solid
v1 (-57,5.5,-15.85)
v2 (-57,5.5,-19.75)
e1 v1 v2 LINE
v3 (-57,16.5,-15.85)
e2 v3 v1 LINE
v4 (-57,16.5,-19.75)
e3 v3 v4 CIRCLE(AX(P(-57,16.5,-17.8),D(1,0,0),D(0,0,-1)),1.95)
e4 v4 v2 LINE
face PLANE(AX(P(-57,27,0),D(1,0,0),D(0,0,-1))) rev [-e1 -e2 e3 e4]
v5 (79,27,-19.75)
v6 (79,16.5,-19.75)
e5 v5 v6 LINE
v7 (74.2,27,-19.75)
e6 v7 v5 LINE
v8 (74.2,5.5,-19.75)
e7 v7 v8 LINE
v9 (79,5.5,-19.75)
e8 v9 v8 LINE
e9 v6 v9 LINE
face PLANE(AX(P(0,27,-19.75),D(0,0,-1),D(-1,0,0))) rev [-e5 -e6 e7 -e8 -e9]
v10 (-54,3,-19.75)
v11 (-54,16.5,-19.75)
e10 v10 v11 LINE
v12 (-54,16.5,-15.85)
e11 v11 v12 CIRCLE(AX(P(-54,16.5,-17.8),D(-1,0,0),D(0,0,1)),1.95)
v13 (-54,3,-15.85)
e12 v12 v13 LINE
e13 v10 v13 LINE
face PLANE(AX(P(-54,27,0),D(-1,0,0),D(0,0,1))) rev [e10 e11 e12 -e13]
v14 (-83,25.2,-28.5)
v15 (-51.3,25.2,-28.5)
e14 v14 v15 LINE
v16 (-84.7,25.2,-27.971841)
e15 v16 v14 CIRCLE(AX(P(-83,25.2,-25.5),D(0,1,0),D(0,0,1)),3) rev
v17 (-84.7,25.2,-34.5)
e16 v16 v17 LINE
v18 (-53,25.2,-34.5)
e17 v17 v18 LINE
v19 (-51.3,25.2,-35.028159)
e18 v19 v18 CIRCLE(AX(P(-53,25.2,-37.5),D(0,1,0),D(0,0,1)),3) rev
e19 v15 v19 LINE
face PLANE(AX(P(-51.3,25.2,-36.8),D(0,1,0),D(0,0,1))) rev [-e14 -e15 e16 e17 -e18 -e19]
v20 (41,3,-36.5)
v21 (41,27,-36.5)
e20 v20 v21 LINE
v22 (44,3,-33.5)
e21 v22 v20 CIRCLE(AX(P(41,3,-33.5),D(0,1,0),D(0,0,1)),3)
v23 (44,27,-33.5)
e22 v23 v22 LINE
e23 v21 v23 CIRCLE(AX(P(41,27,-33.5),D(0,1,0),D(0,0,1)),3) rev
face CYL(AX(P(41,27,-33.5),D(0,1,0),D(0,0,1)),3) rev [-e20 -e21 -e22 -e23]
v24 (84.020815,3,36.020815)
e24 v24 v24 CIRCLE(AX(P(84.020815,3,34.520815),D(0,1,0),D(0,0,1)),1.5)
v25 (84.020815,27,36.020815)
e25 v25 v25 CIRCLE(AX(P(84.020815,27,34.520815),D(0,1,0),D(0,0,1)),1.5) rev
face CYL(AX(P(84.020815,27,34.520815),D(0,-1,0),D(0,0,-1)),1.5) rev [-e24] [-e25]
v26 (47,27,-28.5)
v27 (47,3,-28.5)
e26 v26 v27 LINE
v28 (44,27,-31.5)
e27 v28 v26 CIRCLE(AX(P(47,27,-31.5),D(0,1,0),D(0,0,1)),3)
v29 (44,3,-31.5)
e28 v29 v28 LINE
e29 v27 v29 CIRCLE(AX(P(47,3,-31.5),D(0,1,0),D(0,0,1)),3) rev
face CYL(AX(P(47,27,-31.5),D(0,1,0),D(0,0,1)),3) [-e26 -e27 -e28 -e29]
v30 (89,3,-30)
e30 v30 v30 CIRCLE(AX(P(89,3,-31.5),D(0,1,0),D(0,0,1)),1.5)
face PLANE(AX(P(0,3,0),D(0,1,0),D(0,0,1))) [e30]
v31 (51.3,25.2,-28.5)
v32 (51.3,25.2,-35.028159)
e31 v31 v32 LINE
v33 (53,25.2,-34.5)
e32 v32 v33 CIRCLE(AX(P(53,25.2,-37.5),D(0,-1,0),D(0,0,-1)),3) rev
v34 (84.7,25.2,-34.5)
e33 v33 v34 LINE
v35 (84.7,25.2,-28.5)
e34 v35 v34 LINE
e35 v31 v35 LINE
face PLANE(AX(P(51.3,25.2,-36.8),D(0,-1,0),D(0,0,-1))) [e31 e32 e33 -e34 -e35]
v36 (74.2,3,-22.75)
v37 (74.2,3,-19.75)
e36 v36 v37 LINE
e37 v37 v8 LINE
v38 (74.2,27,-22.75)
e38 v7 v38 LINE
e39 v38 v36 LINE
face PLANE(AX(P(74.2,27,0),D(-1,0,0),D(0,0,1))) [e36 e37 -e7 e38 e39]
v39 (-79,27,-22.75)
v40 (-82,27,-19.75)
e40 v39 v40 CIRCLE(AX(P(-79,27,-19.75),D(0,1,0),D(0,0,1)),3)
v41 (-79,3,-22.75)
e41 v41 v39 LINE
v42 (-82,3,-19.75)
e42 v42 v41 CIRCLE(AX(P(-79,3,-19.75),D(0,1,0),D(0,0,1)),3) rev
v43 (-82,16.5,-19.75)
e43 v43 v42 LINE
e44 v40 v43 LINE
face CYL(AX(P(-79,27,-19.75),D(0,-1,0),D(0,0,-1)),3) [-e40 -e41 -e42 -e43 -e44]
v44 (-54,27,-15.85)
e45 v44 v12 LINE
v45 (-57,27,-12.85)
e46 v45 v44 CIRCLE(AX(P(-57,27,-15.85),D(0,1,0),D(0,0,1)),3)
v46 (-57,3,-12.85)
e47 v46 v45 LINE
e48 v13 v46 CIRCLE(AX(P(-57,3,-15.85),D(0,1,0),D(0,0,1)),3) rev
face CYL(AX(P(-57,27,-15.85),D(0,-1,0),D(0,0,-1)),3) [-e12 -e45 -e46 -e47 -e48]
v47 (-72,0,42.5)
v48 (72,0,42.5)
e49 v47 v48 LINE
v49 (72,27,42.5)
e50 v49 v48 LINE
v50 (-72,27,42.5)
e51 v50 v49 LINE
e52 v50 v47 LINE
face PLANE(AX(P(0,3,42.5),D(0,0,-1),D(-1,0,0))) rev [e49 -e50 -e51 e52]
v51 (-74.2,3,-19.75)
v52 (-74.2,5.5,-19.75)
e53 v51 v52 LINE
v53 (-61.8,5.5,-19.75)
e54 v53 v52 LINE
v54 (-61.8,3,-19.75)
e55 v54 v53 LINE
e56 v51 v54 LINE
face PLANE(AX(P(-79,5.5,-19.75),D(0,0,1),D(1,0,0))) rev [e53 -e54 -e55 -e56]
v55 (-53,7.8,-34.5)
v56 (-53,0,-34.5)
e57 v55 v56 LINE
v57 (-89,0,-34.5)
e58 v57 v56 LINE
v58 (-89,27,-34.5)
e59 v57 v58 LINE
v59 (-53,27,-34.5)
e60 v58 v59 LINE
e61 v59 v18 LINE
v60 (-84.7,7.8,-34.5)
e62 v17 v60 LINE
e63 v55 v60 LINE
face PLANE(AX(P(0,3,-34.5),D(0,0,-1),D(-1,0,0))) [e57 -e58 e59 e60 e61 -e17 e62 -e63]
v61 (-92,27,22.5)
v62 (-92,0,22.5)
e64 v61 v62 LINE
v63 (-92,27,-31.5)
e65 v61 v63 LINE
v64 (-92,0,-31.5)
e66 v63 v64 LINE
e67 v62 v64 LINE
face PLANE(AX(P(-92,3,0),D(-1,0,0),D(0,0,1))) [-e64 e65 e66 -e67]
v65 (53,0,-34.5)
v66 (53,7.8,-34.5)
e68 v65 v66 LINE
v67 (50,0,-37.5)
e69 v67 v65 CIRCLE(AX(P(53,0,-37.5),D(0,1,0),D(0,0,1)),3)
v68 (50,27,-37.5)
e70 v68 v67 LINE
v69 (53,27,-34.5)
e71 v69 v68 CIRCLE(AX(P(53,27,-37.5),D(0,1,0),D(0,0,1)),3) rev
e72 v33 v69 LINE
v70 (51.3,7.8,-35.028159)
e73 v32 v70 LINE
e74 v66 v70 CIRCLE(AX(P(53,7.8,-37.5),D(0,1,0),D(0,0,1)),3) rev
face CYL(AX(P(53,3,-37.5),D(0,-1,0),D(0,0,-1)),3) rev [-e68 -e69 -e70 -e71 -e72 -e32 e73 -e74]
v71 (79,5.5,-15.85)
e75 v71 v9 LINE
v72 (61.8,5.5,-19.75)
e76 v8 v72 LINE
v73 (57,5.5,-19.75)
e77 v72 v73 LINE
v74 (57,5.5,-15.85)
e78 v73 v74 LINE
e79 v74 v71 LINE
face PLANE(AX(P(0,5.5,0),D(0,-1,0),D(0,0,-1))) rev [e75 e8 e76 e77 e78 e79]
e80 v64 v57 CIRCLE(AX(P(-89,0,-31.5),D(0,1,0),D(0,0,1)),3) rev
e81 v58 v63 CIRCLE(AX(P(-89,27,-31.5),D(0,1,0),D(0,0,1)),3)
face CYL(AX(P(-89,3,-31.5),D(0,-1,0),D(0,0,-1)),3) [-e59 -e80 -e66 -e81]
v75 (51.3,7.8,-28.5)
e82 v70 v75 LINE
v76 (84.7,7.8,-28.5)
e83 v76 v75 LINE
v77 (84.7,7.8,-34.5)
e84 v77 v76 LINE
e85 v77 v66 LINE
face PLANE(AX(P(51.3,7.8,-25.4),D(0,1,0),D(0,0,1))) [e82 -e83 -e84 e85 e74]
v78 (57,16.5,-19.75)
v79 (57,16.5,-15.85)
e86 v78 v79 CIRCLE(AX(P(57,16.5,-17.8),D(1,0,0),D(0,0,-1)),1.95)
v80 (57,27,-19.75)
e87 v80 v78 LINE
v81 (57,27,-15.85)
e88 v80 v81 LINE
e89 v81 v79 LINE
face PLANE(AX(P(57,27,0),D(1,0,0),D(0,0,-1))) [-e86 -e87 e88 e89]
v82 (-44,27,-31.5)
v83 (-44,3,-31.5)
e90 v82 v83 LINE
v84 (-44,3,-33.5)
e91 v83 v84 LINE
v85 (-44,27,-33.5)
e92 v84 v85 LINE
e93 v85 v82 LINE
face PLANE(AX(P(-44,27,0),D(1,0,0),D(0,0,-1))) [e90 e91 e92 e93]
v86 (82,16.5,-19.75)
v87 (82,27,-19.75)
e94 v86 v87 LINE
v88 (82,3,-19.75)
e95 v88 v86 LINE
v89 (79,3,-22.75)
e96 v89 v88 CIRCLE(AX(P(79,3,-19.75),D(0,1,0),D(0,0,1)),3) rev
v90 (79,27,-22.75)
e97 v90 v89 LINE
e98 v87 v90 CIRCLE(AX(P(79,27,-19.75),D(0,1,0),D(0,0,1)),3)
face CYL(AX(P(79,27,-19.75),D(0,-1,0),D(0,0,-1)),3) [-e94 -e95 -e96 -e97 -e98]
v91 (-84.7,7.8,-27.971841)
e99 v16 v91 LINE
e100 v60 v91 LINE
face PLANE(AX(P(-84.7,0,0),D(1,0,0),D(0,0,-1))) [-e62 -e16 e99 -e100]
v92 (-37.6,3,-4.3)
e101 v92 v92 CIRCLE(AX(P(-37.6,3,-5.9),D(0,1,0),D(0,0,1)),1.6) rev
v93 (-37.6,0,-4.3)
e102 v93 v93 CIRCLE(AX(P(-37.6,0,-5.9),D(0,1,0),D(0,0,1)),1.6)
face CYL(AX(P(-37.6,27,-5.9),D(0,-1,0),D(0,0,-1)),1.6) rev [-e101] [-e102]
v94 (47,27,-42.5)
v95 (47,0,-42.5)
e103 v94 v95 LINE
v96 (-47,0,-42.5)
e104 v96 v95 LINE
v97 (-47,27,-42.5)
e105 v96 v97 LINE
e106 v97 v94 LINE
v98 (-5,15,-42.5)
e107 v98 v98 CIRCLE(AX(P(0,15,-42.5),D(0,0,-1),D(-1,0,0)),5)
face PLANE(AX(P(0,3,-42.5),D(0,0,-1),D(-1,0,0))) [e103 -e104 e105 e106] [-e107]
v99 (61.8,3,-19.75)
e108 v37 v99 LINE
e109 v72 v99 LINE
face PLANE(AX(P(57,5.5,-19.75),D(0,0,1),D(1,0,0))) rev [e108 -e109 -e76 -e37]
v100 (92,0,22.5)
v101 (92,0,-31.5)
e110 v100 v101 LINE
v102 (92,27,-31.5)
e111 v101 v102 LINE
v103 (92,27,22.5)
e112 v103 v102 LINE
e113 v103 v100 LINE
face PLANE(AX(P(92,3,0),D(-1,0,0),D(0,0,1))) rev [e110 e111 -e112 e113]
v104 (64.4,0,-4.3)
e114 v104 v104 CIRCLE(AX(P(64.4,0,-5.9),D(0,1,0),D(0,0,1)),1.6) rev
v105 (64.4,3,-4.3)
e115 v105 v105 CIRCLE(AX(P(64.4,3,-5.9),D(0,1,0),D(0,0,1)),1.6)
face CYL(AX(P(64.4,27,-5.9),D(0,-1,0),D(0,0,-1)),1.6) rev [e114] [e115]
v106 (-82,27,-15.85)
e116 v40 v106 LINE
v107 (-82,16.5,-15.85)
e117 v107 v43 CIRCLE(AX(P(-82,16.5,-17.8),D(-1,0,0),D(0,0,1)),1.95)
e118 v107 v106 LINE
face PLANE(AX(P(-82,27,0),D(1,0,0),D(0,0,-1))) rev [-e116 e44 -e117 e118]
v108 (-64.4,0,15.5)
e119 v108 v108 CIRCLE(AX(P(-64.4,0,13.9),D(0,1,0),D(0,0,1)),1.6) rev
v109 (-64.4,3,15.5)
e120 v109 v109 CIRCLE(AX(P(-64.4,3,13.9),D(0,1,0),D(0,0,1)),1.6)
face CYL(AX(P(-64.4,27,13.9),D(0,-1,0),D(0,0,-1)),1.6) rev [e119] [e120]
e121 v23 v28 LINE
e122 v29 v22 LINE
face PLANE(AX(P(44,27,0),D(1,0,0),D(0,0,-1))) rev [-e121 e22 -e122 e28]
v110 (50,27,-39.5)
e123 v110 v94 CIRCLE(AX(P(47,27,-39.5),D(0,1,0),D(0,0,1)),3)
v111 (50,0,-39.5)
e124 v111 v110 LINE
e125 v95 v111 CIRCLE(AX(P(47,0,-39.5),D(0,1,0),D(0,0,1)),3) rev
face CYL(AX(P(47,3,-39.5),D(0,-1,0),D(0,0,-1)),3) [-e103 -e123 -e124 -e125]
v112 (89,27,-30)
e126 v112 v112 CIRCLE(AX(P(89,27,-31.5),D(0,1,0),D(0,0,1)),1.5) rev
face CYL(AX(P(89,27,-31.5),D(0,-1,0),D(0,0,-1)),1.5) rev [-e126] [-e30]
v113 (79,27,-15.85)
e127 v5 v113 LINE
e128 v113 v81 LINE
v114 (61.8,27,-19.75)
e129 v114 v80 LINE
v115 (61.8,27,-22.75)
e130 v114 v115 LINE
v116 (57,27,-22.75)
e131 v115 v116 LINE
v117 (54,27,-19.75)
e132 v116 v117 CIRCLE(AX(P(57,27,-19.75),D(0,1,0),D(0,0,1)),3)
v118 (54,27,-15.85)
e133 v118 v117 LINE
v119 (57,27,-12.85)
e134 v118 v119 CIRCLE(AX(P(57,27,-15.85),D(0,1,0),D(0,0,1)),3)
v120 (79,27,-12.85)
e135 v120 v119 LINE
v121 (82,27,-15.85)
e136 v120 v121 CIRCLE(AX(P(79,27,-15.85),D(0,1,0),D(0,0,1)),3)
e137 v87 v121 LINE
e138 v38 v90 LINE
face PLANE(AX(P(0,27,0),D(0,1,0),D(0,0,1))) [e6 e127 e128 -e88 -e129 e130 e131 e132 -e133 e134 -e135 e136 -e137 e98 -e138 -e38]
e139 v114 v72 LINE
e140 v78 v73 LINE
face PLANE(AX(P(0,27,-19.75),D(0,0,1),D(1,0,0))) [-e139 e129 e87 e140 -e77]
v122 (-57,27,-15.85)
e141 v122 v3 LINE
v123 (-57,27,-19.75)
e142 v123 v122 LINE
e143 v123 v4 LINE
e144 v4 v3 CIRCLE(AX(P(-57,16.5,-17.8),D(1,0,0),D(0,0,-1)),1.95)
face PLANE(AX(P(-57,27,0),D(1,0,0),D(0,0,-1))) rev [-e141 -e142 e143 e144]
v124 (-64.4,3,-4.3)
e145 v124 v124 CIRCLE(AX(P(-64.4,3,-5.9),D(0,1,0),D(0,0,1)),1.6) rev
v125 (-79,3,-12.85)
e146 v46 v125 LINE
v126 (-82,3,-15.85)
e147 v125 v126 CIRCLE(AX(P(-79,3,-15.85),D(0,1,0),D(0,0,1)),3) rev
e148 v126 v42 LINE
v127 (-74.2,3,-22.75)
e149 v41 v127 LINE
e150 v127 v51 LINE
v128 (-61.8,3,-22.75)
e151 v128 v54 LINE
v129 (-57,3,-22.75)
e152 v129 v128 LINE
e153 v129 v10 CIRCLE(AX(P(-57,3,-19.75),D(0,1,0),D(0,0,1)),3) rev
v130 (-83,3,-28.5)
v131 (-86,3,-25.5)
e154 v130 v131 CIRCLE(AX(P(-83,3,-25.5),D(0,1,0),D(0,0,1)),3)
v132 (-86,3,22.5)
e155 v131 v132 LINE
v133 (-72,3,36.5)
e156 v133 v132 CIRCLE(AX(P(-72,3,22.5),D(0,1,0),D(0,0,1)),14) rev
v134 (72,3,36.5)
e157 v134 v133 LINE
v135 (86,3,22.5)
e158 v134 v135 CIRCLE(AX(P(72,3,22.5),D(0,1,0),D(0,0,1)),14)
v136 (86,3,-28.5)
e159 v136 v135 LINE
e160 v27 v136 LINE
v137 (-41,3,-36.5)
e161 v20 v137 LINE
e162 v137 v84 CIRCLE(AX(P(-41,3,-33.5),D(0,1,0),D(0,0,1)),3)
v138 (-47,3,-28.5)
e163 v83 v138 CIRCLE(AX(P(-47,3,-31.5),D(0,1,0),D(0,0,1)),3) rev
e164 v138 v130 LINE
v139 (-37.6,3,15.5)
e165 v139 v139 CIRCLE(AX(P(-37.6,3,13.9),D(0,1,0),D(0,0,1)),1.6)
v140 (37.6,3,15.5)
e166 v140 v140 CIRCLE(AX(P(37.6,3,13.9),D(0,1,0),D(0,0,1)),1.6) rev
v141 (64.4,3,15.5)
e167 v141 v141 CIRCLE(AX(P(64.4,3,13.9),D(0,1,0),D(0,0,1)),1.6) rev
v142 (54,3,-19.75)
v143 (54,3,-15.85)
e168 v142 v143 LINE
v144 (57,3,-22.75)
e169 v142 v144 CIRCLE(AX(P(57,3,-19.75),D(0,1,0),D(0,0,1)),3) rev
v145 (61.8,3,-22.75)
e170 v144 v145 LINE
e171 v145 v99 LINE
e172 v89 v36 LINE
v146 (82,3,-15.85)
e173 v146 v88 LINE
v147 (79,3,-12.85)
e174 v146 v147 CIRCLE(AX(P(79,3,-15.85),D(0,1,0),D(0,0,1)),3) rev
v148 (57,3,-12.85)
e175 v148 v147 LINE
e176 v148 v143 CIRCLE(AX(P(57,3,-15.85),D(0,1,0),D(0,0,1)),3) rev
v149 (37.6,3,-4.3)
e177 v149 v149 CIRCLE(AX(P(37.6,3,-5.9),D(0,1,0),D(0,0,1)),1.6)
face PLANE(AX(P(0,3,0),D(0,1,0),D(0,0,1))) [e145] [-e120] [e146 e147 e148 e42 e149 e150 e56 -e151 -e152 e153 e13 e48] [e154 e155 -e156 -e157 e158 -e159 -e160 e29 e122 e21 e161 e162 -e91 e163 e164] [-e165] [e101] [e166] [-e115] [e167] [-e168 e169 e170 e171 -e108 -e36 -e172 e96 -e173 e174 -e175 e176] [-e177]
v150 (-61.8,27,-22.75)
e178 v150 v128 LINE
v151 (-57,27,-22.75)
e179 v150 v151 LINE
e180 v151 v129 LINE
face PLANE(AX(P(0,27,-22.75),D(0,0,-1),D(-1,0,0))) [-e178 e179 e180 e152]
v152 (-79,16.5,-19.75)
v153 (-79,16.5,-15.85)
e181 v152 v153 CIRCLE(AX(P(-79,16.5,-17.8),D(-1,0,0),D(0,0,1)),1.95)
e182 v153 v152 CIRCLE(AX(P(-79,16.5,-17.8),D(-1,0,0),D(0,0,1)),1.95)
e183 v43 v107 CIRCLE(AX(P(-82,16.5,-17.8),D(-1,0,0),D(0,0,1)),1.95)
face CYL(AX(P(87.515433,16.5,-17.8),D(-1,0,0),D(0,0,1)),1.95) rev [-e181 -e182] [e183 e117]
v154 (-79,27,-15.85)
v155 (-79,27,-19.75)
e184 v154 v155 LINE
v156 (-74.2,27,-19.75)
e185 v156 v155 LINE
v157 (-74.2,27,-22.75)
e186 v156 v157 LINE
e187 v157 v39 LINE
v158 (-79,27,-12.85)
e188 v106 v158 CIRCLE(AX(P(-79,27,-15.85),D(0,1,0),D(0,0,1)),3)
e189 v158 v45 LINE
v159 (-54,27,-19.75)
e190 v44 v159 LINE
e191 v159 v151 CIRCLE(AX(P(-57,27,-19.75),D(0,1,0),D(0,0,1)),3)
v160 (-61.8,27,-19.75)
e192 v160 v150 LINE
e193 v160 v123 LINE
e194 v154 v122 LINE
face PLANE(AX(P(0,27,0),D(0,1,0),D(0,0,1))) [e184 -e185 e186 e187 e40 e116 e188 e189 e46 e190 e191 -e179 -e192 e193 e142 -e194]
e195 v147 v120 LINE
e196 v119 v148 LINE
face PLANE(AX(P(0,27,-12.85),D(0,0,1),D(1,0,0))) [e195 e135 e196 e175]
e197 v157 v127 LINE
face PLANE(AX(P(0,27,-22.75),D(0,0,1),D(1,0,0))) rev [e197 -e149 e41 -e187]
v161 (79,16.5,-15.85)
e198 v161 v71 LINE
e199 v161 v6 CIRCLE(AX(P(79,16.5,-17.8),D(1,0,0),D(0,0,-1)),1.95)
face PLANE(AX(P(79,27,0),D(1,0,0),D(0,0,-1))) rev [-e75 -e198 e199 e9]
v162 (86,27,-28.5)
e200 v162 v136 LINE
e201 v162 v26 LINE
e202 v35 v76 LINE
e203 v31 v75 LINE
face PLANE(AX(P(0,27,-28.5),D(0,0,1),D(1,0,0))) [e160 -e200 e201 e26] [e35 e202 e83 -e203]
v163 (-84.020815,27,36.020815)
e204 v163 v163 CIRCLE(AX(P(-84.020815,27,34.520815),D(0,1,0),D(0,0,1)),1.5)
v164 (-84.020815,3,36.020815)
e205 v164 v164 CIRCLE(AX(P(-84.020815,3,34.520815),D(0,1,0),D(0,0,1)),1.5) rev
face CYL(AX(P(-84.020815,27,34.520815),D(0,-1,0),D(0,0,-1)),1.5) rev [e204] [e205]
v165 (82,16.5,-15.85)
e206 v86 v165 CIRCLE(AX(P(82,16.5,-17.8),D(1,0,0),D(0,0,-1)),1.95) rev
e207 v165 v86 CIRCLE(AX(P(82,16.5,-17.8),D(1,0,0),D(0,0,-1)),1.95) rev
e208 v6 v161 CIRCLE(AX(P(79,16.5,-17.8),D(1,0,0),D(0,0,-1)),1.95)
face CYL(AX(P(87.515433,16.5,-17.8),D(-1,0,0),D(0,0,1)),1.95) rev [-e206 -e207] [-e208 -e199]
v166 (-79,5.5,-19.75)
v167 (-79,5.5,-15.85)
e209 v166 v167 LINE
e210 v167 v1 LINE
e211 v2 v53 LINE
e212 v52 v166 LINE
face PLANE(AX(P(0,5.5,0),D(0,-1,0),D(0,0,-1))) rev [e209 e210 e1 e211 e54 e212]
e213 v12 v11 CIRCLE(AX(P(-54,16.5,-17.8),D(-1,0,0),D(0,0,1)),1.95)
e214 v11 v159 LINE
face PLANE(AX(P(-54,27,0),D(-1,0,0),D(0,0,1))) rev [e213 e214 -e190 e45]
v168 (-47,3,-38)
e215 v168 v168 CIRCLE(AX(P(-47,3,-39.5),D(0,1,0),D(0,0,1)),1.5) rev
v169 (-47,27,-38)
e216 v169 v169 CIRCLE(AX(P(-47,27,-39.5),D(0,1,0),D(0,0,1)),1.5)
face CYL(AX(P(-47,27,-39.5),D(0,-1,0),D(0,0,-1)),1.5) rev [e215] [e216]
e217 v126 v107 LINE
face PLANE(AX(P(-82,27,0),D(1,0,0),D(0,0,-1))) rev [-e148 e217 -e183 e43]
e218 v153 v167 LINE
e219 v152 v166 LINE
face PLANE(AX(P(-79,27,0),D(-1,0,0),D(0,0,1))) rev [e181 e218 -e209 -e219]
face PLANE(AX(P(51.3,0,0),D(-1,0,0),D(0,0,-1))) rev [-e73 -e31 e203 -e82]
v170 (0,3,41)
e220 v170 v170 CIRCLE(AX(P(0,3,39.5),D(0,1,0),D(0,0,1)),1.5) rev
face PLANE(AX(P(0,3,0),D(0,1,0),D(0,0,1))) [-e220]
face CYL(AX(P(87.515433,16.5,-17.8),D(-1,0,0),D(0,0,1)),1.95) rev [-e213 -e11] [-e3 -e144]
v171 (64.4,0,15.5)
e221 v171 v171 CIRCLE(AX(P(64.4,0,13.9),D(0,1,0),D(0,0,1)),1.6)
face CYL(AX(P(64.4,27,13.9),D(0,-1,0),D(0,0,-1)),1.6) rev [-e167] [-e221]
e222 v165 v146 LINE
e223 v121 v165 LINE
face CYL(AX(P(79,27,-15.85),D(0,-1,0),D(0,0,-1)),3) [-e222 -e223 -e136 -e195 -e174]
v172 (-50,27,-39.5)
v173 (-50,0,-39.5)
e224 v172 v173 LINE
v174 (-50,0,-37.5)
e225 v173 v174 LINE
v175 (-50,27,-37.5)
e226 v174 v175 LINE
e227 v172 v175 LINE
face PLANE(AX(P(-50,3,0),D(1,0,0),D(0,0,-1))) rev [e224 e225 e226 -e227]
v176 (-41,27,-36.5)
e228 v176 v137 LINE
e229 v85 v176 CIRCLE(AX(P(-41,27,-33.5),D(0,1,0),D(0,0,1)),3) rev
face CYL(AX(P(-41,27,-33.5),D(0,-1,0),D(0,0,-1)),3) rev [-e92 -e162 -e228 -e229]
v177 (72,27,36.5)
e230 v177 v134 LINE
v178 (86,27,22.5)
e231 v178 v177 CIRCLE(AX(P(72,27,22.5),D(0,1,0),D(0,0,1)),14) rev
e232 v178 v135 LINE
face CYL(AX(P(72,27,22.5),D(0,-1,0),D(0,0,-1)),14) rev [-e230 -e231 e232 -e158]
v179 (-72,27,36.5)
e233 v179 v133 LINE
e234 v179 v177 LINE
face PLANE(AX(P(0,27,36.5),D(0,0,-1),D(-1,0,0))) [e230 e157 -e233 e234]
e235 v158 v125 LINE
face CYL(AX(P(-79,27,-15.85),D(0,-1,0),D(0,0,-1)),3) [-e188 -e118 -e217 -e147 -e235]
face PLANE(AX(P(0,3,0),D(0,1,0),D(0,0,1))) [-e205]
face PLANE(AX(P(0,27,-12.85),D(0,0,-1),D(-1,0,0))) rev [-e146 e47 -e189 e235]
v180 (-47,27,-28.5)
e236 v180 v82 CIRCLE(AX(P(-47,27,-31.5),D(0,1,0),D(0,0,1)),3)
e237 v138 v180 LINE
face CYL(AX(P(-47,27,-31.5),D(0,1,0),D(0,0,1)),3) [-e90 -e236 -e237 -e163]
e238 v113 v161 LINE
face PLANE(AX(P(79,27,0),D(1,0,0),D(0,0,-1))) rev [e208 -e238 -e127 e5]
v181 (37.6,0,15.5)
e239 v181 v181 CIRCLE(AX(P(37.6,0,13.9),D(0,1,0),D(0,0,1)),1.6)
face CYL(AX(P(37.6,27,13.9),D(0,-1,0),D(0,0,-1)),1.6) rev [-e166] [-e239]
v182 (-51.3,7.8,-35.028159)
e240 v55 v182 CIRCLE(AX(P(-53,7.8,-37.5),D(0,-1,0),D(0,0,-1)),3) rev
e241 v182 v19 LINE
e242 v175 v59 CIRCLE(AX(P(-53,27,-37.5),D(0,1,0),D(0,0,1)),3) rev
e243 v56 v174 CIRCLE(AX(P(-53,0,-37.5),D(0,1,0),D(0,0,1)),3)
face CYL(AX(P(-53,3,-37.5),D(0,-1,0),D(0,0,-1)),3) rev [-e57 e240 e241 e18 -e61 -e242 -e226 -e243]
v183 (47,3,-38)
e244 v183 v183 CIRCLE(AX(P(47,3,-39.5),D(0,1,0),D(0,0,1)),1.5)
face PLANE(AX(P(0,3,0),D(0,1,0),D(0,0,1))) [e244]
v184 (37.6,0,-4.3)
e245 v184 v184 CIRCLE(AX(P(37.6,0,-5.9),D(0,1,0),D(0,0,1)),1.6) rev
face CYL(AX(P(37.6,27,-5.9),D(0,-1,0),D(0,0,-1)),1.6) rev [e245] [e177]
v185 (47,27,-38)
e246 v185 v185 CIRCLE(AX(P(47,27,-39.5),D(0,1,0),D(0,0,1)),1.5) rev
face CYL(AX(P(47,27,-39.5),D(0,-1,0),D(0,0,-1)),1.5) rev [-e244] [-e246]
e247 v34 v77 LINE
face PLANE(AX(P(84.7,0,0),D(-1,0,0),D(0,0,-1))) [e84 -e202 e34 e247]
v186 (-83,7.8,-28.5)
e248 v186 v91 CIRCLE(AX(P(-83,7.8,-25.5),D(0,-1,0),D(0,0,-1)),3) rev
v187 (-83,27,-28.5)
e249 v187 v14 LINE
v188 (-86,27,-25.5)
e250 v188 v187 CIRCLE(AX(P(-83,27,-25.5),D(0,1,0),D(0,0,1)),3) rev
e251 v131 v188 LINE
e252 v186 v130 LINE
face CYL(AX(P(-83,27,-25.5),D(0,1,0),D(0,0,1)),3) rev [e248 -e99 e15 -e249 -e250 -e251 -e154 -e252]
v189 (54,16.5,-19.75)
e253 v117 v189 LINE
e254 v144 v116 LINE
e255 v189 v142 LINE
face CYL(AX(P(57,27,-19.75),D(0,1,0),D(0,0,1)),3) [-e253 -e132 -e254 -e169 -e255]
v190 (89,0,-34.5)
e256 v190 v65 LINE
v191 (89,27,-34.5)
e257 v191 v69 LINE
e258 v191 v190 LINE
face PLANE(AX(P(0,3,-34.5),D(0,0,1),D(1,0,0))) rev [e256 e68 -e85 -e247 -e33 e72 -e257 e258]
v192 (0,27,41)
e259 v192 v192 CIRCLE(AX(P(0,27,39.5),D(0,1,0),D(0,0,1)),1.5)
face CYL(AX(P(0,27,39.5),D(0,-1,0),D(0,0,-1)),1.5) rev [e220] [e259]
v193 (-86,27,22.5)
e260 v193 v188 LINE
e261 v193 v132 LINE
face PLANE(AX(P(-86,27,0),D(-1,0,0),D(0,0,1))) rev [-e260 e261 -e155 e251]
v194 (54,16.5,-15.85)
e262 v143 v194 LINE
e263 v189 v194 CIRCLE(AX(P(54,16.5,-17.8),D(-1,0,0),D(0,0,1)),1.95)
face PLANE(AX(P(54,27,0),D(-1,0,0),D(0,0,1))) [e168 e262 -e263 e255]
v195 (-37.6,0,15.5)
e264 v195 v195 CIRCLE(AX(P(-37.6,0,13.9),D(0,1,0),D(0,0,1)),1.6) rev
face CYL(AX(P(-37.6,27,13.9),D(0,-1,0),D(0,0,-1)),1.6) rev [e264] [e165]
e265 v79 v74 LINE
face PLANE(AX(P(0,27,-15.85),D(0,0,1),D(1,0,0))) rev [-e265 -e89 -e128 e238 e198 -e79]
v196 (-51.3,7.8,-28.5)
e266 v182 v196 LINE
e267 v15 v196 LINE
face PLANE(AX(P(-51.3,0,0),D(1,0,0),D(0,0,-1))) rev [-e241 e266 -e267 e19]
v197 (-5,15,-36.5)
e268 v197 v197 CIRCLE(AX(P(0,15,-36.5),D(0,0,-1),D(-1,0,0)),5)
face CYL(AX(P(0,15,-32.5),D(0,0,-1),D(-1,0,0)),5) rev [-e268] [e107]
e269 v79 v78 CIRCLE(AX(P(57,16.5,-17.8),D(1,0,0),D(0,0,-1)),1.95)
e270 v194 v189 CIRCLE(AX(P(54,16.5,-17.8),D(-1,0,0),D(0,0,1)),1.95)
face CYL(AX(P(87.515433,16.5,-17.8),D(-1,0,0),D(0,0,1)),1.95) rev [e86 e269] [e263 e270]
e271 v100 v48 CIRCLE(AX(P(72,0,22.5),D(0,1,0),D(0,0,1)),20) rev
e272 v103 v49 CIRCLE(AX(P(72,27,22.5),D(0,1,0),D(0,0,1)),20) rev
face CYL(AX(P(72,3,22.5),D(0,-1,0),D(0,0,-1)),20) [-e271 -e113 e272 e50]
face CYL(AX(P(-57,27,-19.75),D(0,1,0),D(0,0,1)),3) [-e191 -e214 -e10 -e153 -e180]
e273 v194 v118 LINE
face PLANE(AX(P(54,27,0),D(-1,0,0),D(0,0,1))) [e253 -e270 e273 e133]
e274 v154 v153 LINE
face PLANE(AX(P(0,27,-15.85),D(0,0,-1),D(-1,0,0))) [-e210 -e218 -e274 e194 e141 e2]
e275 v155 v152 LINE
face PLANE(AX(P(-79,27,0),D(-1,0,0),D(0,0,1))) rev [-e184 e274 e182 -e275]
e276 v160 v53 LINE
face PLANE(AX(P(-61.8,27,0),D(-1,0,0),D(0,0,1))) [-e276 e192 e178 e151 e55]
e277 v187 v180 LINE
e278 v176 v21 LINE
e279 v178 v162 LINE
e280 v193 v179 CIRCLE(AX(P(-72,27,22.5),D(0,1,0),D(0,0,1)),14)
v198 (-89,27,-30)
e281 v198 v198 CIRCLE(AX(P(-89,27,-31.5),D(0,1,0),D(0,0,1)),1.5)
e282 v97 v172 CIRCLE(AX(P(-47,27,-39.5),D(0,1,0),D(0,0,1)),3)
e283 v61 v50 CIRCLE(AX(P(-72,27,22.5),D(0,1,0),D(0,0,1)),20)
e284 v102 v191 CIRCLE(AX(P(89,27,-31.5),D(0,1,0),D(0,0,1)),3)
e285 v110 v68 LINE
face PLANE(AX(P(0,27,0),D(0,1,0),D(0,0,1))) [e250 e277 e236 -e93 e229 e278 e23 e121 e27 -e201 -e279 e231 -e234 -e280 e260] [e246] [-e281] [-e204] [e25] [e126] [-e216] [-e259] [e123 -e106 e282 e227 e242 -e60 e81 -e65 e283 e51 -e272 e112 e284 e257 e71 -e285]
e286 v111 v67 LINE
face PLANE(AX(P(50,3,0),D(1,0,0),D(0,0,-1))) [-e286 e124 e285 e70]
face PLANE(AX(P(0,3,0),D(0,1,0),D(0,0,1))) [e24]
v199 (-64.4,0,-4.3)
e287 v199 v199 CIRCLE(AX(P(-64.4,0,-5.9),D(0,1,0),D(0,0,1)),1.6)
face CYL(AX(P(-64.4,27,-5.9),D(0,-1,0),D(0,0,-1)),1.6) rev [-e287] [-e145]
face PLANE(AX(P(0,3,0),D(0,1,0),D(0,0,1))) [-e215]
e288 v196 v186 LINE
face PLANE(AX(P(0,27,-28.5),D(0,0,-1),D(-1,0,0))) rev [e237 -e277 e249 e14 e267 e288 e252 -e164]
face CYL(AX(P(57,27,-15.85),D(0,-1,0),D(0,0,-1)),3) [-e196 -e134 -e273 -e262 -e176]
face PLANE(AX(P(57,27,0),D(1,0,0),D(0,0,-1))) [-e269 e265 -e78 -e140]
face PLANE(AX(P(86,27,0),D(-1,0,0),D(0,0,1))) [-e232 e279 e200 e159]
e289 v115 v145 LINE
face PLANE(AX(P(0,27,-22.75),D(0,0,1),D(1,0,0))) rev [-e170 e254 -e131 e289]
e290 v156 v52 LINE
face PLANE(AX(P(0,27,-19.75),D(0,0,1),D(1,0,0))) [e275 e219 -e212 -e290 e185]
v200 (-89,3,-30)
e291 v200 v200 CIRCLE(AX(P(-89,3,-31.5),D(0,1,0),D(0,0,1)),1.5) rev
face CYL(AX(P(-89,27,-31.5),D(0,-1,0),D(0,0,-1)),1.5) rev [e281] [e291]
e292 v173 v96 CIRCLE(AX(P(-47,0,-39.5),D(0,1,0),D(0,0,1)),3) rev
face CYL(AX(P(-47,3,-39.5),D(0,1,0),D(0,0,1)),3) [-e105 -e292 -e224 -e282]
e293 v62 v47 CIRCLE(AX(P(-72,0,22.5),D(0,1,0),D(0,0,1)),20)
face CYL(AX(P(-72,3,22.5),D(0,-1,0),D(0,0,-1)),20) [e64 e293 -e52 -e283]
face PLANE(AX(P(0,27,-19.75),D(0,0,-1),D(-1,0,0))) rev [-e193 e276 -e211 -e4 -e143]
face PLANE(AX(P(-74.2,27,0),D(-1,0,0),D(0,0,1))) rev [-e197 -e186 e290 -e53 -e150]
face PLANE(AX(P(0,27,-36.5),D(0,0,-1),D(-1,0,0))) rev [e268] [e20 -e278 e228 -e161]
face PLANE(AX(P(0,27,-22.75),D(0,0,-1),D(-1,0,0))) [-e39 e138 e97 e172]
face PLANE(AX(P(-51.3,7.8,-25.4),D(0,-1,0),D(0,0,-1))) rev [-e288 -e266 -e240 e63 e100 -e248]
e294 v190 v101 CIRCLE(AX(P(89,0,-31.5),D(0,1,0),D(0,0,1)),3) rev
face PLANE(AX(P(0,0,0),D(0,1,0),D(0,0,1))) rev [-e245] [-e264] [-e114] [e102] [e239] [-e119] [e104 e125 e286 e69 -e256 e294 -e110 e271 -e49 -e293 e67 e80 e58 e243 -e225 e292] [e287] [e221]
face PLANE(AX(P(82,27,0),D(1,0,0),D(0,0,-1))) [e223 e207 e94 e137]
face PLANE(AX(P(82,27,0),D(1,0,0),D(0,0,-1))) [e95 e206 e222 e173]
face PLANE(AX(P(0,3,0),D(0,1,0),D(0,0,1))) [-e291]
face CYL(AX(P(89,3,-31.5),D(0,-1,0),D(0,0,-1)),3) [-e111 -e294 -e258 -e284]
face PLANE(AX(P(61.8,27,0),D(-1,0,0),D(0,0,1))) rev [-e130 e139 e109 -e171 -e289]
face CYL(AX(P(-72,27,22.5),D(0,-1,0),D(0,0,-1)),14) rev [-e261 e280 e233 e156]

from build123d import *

# Parameters (mm, degrees)
BOSS_EXTRUDE1_DEPTH = 3
SKETCH1_9_R         = 1.5
SKETCH1_9_W         = 3
SKETCH1_9_H         = 3.9
SKETCH1_9_W_2       = 7.8
SKETCH1_9_H_2       = 3
BOSS_EXTRUDE2_DEPTH = 27
SKETCH2_W           = 22
SKETCH2_H           = 3.9
BOSS_EXTRUDE3_DEPTH = 2.5
CUT_EXTRUDE1_REACH  = 183.139
SKETCH6_R           = 1.95
SKETCH1_12_R        = 1.6
CUT_EXTRUDE7_DEPTH  = 105.877309271
SKETCH7_R           = 5
CUT_EXTRUDE8_DEPTH  = 10
FILLET1_R           = 3
FILLET2_R           = 3
CUT_EXTRUDE9_START  = -7.3
SKETCH8_W           = 11.4
SKETCH8_H           = 17.4
CUT_EXTRUDE9_DEPTH  = 33.4


with BuildPart() as part:
    # Sketch1 → Boss-Extrude1 (new body)
    with BuildSketch(Plane(origin=(0, 0, 0), x_dir=(1, 0, 0), z_dir=(0, 1, 0))):
        with BuildLine():
            ThreePointArc((-92, -22.5), (-86.142135624, -36.642135624), (-72, -42.5))
            Line((-72, -42.5), (72, -42.5))
            ThreePointArc((72, -42.5), (86.142135624, -36.642135624), (92, -22.5))
            Line((92, -22.5), (92, 34.5))
            Line((92, 34.5), (50, 34.5))
            Line((50, 34.5), (50, 42.5))
            Line((50, 42.5), (-50, 42.5))
            Line((-50, 42.5), (-50, 34.5))
            Line((-50, 34.5), (-92, 34.5))
            Line((-92, 34.5), (-92, -22.5))
        make_face()
    extrude(amount=BOSS_EXTRUDE1_DEPTH)

    # Sketch1<9> → Boss-Extrude2 (add)
    # profile 1 of 13: a face of its own
    with BuildSketch(Plane(origin=(0, 0, 0), x_dir=(1, 0, 0), z_dir=(0, 1, 0))):
        with BuildLine():
            ThreePointArc((-92, -22.5), (-86.142135624, -36.642135624), (-72, -42.5))
            Line((-72, -42.5), (72, -42.5))
            ThreePointArc((72, -42.5), (86.142135624, -36.642135624), (92, -22.5))
            Line((92, -22.5), (92, 34.5))
            Line((92, 34.5), (50, 34.5))
            Line((50, 34.5), (50, 42.5))
            Line((50, 42.5), (-50, 42.5))
            Line((-50, 42.5), (-50, 34.5))
            Line((-50, 34.5), (-92, 34.5))
            Line((-92, 34.5), (-92, -22.5))
        make_face()
        with Locations(Location((0, -39.5, 0), (0, 0, 270))):
            Circle(SKETCH1_9_R, mode=Mode.SUBTRACT)
        with Locations(Location((-89, 31.5, 0), (0, 0, 270))):
            Circle(SKETCH1_9_R, mode=Mode.SUBTRACT)
        with Locations(Location((-47, 39.5, 0), (0, 0, 270))):
            Circle(SKETCH1_9_R, mode=Mode.SUBTRACT)
        Polygon((-72, -36.5), (-86, -36.5), (-86, -22.5), (-86, 28.5), (-44, 28.5), (-44, 36.5), (44, 36.5), (44, 28.5), (86, 28.5), (86, -22.5), (86, -36.5), (72, -36.5), align=None, mode=Mode.SUBTRACT)
        with Locations(Location((89, 31.5, 0), (0, 0, 270))):
            Circle(SKETCH1_9_R, mode=Mode.SUBTRACT)
        with Locations(Location((47, 39.5, 0), (0, 0, 270))):
            Circle(SKETCH1_9_R, mode=Mode.SUBTRACT)
    # profile 2 of 13: a face of its own
    with BuildSketch(Plane(origin=(0, 0, 0), x_dir=(1, 0, 0), z_dir=(0, 1, 0))):
        Polygon((-57, 19.75), (-54, 19.75), (-54, 22.75), (-61.8, 22.75), (-61.8, 19.75), align=None)
    # profile 3 of 13: a face of its own
    with BuildSketch(Plane(origin=(0, 0, 0), x_dir=(1, 0, 0), z_dir=(0, 1, 0))):
        with Locations((-55.5, 17.8)):
            Rectangle(SKETCH1_9_W, SKETCH1_9_H)
    # profile 4 of 13: a face of its own
    with BuildSketch(Plane(origin=(0, 0, 0), x_dir=(1, 0, 0), z_dir=(0, 1, 0))):
        Polygon((-54, 12.85), (-54, 15.85), (-57, 15.85), (-79, 15.85), (-79, 12.85), align=None)
    # profile 5 of 13: a face of its own
    with BuildSketch(Plane(origin=(0, 0, 0), x_dir=(1, 0, 0), z_dir=(0, 1, 0))):
        Polygon((-82, 19.75), (-79, 19.75), (-74.2, 19.75), (-74.2, 22.75), (-82, 22.75), align=None)
    # profile 6 of 13: a face of its own
    with BuildSketch(Plane(origin=(0, 0, 0), x_dir=(1, 0, 0), z_dir=(0, 1, 0))):
        Polygon((-79, 12.85), (-79, 15.85), (-79, 19.75), (-82, 19.75), (-82, 12.85), align=None)
    # profile 7 of 13: a face of its own
    with BuildSketch(Plane(origin=(0, 0, 0), x_dir=(1, 0, 0), z_dir=(0, 1, 0))):
        with Locations((57.9, 21.25)):
            Rectangle(SKETCH1_9_W_2, SKETCH1_9_H_2)
    # profile 8 of 13: a face of its own
    with BuildSketch(Plane(origin=(0, 0, 0), x_dir=(1, 0, 0), z_dir=(0, 1, 0))):
        with Locations((55.5, 17.8)):
            Rectangle(SKETCH1_9_W, SKETCH1_9_H)
    # profile 9 of 13: a face of its own
    with BuildSketch(Plane(origin=(0, 0, 0), x_dir=(1, 0, 0), z_dir=(0, 1, 0))):
        Polygon((79, 15.85), (57, 15.85), (54, 15.85), (54, 12.85), (79, 12.85), align=None)
    # profile 10 of 13: a face of its own
    with BuildSketch(Plane(origin=(0, 0, 0), x_dir=(1, 0, 0), z_dir=(0, 1, 0))):
        with Locations((78.1, 21.25)):
            Rectangle(SKETCH1_9_W_2, SKETCH1_9_H_2)
    # profile 11 of 13: a face of its own
    with BuildSketch(Plane(origin=(0, 0, 0), x_dir=(1, 0, 0), z_dir=(0, 1, 0))):
        Polygon((79, 19.75), (79, 15.85), (79, 12.85), (82, 12.85), (82, 19.75), align=None)
    # profile 12 of 13: a face of its own
    with BuildSketch(Plane(origin=(0, 0, 0), x_dir=(1, 0, 0), z_dir=(0, 1, 0))):
        with BuildLine():
            Line((-86, -22.5), (-86, -36.5))
            Line((-86, -36.5), (-72, -36.5))
            ThreePointArc((-72, -36.5), (-81.899494937, -32.399494937), (-86, -22.5))
        make_face()
        with Locations(Location((-84.02081528, -34.52081528, 0), (0, 0, 270))):
            Circle(SKETCH1_9_R, mode=Mode.SUBTRACT)
    # profile 13 of 13: a face of its own
    with BuildSketch(Plane(origin=(0, 0, 0), x_dir=(1, 0, 0), z_dir=(0, 1, 0))):
        with BuildLine():
            ThreePointArc((86, -22.5), (81.899494937, -32.399494937), (72, -36.5))
            Line((72, -36.5), (86, -36.5))
            Line((86, -36.5), (86, -22.5))
        make_face()
        with Locations(Location((84.02081528, -34.52081528, 0), (0, 0, 270))):
            Circle(SKETCH1_9_R, mode=Mode.SUBTRACT)
    extrude(amount=BOSS_EXTRUDE2_DEPTH)

    # Sketch2 → Boss-Extrude3 (add)
    with BuildSketch(Plane(origin=(0, 3, 0), x_dir=(1, 0, 0), z_dir=(0, 1, 0))):
        with Locations((-68, 17.8)):
            Rectangle(SKETCH2_W, SKETCH2_H)
        with Locations((68, 17.8)):
            Rectangle(SKETCH2_W, SKETCH2_H)
    extrude(amount=BOSS_EXTRUDE3_DEPTH)

    # Cut-Extrude1: up to this face of the body (flat: up to its plane)
    cut_extrude1_end = Plane(part.part.faces().sort_by_distance((82, 15, -17.8))[0])
    # Sketch6 → Cut-Extrude1 (cut, up to the picked face)
    with BuildSketch(Plane.ZY.offset(82), mode=Mode.PRIVATE) as cut_extrude1_sk1:
        with Locations((-17.8, 16.5)):
            Circle(SKETCH6_R)
    cut_extrude1_tool1 = split(extrude(cut_extrude1_sk1.sketch, amount=-CUT_EXTRUDE1_REACH, mode=Mode.PRIVATE), bisect_by=cut_extrude1_end, keep=Keep.BOTH, mode=Mode.PRIVATE)
    add(cut_extrude1_tool1.solids().sort_by(Axis((-82, 16.5, -17.8), (1, 0, 0)))[0], mode=Mode.SUBTRACT)

    # Sketch1<12> → Cut-Extrude7 (cut, through all)
    with BuildSketch(Plane(origin=(0, 0, 0), x_dir=(1, 0, 0), z_dir=(0, 1, 0))):
        with Locations(Location((-64.4, -13.9, 0), (0, 0, 270))):
            Circle(SKETCH1_12_R)
        with Locations(Location((-37.6, -13.9, 0), (0, 0, 270))):
            Circle(SKETCH1_12_R)
        with Locations(Location((64.4, 5.9, 0), (0, 0, 270))):
            Circle(SKETCH1_12_R)
        with Locations(Location((37.6, 5.9, 0), (0, 0, 270))):
            Circle(SKETCH1_12_R)
        with Locations(Location((64.4, -13.9, 0), (0, 0, 270))):
            Circle(SKETCH1_12_R)
        with Locations(Location((37.6, -13.9, 0), (0, 0, 270))):
            Circle(SKETCH1_12_R)
        with Locations(Location((-64.4, 5.9, 0), (0, 0, 270))):
            Circle(SKETCH1_12_R)
        with Locations(Location((-37.6, 5.9, 0), (0, 0, 270))):
            Circle(SKETCH1_12_R)
    extrude(amount=CUT_EXTRUDE7_DEPTH, mode=Mode.SUBTRACT)

    # Sketch7 → Cut-Extrude8 (cut)
    with BuildSketch(Plane(origin=(0, 0, -42.5), x_dir=(-1, 0, 0), z_dir=(0, 0, -1))):
        with Locations((0, 15)):
            Circle(SKETCH7_R)
    extrude(amount=-CUT_EXTRUDE8_DEPTH, mode=Mode.SUBTRACT)

    # Fillet1
    fillet1_edges = [part.edges().sort_by_distance(p)[0] for p in [
        (-86, 15, -28.5),
        (-44, 15, -28.5),
        (-44, 15, -36.5),
        (44, 15, -36.5),
        (44, 15, -28.5),
        (-92, 13.5, -34.5),
        (-50, 13.5, -34.5),
        (-50, 13.5, -42.5),
        (50, 13.5, -42.5),
        (50, 13.5, -34.5),
        (92, 13.5, -34.5),
    ]]
    fillet(fillet1_edges, radius=FILLET1_R)

    # Fillet2
    fillet2_edges = [part.edges().sort_by_distance(p)[0] for p in [
        (54, 15, -22.75),
        (54, 15, -12.85),
        (82, 15, -12.85),
        (82, 15, -22.75),
        (-82, 15, -22.75),
        (-82, 15, -12.85),
        (-54, 15, -12.85),
        (-54, 15, -22.75),
    ]]
    fillet(fillet2_edges, radius=FILLET2_R - 0.0001)  # a hair under: the kernel refuses the full size

    # Sketch8 → Cut-Extrude9 (cut)
    with BuildSketch(Plane.ZY.offset(92).offset(CUT_EXTRUDE9_START)):
        with Locations((-31.1, 16.5)):
            Rectangle(SKETCH8_W, SKETCH8_H)
    cut_extrude9 = extrude(amount=-CUT_EXTRUDE9_DEPTH, mode=Mode.SUBTRACT)

    # Mirror1: Cut-Extrude9 across plane
    add(cut_extrude9.mirror(Plane(origin=(0, 0, 0), x_dir=(0, 0, 1), z_dir=(1, 0, 0))), mode=Mode.SUBTRACT)


solid = part.part
